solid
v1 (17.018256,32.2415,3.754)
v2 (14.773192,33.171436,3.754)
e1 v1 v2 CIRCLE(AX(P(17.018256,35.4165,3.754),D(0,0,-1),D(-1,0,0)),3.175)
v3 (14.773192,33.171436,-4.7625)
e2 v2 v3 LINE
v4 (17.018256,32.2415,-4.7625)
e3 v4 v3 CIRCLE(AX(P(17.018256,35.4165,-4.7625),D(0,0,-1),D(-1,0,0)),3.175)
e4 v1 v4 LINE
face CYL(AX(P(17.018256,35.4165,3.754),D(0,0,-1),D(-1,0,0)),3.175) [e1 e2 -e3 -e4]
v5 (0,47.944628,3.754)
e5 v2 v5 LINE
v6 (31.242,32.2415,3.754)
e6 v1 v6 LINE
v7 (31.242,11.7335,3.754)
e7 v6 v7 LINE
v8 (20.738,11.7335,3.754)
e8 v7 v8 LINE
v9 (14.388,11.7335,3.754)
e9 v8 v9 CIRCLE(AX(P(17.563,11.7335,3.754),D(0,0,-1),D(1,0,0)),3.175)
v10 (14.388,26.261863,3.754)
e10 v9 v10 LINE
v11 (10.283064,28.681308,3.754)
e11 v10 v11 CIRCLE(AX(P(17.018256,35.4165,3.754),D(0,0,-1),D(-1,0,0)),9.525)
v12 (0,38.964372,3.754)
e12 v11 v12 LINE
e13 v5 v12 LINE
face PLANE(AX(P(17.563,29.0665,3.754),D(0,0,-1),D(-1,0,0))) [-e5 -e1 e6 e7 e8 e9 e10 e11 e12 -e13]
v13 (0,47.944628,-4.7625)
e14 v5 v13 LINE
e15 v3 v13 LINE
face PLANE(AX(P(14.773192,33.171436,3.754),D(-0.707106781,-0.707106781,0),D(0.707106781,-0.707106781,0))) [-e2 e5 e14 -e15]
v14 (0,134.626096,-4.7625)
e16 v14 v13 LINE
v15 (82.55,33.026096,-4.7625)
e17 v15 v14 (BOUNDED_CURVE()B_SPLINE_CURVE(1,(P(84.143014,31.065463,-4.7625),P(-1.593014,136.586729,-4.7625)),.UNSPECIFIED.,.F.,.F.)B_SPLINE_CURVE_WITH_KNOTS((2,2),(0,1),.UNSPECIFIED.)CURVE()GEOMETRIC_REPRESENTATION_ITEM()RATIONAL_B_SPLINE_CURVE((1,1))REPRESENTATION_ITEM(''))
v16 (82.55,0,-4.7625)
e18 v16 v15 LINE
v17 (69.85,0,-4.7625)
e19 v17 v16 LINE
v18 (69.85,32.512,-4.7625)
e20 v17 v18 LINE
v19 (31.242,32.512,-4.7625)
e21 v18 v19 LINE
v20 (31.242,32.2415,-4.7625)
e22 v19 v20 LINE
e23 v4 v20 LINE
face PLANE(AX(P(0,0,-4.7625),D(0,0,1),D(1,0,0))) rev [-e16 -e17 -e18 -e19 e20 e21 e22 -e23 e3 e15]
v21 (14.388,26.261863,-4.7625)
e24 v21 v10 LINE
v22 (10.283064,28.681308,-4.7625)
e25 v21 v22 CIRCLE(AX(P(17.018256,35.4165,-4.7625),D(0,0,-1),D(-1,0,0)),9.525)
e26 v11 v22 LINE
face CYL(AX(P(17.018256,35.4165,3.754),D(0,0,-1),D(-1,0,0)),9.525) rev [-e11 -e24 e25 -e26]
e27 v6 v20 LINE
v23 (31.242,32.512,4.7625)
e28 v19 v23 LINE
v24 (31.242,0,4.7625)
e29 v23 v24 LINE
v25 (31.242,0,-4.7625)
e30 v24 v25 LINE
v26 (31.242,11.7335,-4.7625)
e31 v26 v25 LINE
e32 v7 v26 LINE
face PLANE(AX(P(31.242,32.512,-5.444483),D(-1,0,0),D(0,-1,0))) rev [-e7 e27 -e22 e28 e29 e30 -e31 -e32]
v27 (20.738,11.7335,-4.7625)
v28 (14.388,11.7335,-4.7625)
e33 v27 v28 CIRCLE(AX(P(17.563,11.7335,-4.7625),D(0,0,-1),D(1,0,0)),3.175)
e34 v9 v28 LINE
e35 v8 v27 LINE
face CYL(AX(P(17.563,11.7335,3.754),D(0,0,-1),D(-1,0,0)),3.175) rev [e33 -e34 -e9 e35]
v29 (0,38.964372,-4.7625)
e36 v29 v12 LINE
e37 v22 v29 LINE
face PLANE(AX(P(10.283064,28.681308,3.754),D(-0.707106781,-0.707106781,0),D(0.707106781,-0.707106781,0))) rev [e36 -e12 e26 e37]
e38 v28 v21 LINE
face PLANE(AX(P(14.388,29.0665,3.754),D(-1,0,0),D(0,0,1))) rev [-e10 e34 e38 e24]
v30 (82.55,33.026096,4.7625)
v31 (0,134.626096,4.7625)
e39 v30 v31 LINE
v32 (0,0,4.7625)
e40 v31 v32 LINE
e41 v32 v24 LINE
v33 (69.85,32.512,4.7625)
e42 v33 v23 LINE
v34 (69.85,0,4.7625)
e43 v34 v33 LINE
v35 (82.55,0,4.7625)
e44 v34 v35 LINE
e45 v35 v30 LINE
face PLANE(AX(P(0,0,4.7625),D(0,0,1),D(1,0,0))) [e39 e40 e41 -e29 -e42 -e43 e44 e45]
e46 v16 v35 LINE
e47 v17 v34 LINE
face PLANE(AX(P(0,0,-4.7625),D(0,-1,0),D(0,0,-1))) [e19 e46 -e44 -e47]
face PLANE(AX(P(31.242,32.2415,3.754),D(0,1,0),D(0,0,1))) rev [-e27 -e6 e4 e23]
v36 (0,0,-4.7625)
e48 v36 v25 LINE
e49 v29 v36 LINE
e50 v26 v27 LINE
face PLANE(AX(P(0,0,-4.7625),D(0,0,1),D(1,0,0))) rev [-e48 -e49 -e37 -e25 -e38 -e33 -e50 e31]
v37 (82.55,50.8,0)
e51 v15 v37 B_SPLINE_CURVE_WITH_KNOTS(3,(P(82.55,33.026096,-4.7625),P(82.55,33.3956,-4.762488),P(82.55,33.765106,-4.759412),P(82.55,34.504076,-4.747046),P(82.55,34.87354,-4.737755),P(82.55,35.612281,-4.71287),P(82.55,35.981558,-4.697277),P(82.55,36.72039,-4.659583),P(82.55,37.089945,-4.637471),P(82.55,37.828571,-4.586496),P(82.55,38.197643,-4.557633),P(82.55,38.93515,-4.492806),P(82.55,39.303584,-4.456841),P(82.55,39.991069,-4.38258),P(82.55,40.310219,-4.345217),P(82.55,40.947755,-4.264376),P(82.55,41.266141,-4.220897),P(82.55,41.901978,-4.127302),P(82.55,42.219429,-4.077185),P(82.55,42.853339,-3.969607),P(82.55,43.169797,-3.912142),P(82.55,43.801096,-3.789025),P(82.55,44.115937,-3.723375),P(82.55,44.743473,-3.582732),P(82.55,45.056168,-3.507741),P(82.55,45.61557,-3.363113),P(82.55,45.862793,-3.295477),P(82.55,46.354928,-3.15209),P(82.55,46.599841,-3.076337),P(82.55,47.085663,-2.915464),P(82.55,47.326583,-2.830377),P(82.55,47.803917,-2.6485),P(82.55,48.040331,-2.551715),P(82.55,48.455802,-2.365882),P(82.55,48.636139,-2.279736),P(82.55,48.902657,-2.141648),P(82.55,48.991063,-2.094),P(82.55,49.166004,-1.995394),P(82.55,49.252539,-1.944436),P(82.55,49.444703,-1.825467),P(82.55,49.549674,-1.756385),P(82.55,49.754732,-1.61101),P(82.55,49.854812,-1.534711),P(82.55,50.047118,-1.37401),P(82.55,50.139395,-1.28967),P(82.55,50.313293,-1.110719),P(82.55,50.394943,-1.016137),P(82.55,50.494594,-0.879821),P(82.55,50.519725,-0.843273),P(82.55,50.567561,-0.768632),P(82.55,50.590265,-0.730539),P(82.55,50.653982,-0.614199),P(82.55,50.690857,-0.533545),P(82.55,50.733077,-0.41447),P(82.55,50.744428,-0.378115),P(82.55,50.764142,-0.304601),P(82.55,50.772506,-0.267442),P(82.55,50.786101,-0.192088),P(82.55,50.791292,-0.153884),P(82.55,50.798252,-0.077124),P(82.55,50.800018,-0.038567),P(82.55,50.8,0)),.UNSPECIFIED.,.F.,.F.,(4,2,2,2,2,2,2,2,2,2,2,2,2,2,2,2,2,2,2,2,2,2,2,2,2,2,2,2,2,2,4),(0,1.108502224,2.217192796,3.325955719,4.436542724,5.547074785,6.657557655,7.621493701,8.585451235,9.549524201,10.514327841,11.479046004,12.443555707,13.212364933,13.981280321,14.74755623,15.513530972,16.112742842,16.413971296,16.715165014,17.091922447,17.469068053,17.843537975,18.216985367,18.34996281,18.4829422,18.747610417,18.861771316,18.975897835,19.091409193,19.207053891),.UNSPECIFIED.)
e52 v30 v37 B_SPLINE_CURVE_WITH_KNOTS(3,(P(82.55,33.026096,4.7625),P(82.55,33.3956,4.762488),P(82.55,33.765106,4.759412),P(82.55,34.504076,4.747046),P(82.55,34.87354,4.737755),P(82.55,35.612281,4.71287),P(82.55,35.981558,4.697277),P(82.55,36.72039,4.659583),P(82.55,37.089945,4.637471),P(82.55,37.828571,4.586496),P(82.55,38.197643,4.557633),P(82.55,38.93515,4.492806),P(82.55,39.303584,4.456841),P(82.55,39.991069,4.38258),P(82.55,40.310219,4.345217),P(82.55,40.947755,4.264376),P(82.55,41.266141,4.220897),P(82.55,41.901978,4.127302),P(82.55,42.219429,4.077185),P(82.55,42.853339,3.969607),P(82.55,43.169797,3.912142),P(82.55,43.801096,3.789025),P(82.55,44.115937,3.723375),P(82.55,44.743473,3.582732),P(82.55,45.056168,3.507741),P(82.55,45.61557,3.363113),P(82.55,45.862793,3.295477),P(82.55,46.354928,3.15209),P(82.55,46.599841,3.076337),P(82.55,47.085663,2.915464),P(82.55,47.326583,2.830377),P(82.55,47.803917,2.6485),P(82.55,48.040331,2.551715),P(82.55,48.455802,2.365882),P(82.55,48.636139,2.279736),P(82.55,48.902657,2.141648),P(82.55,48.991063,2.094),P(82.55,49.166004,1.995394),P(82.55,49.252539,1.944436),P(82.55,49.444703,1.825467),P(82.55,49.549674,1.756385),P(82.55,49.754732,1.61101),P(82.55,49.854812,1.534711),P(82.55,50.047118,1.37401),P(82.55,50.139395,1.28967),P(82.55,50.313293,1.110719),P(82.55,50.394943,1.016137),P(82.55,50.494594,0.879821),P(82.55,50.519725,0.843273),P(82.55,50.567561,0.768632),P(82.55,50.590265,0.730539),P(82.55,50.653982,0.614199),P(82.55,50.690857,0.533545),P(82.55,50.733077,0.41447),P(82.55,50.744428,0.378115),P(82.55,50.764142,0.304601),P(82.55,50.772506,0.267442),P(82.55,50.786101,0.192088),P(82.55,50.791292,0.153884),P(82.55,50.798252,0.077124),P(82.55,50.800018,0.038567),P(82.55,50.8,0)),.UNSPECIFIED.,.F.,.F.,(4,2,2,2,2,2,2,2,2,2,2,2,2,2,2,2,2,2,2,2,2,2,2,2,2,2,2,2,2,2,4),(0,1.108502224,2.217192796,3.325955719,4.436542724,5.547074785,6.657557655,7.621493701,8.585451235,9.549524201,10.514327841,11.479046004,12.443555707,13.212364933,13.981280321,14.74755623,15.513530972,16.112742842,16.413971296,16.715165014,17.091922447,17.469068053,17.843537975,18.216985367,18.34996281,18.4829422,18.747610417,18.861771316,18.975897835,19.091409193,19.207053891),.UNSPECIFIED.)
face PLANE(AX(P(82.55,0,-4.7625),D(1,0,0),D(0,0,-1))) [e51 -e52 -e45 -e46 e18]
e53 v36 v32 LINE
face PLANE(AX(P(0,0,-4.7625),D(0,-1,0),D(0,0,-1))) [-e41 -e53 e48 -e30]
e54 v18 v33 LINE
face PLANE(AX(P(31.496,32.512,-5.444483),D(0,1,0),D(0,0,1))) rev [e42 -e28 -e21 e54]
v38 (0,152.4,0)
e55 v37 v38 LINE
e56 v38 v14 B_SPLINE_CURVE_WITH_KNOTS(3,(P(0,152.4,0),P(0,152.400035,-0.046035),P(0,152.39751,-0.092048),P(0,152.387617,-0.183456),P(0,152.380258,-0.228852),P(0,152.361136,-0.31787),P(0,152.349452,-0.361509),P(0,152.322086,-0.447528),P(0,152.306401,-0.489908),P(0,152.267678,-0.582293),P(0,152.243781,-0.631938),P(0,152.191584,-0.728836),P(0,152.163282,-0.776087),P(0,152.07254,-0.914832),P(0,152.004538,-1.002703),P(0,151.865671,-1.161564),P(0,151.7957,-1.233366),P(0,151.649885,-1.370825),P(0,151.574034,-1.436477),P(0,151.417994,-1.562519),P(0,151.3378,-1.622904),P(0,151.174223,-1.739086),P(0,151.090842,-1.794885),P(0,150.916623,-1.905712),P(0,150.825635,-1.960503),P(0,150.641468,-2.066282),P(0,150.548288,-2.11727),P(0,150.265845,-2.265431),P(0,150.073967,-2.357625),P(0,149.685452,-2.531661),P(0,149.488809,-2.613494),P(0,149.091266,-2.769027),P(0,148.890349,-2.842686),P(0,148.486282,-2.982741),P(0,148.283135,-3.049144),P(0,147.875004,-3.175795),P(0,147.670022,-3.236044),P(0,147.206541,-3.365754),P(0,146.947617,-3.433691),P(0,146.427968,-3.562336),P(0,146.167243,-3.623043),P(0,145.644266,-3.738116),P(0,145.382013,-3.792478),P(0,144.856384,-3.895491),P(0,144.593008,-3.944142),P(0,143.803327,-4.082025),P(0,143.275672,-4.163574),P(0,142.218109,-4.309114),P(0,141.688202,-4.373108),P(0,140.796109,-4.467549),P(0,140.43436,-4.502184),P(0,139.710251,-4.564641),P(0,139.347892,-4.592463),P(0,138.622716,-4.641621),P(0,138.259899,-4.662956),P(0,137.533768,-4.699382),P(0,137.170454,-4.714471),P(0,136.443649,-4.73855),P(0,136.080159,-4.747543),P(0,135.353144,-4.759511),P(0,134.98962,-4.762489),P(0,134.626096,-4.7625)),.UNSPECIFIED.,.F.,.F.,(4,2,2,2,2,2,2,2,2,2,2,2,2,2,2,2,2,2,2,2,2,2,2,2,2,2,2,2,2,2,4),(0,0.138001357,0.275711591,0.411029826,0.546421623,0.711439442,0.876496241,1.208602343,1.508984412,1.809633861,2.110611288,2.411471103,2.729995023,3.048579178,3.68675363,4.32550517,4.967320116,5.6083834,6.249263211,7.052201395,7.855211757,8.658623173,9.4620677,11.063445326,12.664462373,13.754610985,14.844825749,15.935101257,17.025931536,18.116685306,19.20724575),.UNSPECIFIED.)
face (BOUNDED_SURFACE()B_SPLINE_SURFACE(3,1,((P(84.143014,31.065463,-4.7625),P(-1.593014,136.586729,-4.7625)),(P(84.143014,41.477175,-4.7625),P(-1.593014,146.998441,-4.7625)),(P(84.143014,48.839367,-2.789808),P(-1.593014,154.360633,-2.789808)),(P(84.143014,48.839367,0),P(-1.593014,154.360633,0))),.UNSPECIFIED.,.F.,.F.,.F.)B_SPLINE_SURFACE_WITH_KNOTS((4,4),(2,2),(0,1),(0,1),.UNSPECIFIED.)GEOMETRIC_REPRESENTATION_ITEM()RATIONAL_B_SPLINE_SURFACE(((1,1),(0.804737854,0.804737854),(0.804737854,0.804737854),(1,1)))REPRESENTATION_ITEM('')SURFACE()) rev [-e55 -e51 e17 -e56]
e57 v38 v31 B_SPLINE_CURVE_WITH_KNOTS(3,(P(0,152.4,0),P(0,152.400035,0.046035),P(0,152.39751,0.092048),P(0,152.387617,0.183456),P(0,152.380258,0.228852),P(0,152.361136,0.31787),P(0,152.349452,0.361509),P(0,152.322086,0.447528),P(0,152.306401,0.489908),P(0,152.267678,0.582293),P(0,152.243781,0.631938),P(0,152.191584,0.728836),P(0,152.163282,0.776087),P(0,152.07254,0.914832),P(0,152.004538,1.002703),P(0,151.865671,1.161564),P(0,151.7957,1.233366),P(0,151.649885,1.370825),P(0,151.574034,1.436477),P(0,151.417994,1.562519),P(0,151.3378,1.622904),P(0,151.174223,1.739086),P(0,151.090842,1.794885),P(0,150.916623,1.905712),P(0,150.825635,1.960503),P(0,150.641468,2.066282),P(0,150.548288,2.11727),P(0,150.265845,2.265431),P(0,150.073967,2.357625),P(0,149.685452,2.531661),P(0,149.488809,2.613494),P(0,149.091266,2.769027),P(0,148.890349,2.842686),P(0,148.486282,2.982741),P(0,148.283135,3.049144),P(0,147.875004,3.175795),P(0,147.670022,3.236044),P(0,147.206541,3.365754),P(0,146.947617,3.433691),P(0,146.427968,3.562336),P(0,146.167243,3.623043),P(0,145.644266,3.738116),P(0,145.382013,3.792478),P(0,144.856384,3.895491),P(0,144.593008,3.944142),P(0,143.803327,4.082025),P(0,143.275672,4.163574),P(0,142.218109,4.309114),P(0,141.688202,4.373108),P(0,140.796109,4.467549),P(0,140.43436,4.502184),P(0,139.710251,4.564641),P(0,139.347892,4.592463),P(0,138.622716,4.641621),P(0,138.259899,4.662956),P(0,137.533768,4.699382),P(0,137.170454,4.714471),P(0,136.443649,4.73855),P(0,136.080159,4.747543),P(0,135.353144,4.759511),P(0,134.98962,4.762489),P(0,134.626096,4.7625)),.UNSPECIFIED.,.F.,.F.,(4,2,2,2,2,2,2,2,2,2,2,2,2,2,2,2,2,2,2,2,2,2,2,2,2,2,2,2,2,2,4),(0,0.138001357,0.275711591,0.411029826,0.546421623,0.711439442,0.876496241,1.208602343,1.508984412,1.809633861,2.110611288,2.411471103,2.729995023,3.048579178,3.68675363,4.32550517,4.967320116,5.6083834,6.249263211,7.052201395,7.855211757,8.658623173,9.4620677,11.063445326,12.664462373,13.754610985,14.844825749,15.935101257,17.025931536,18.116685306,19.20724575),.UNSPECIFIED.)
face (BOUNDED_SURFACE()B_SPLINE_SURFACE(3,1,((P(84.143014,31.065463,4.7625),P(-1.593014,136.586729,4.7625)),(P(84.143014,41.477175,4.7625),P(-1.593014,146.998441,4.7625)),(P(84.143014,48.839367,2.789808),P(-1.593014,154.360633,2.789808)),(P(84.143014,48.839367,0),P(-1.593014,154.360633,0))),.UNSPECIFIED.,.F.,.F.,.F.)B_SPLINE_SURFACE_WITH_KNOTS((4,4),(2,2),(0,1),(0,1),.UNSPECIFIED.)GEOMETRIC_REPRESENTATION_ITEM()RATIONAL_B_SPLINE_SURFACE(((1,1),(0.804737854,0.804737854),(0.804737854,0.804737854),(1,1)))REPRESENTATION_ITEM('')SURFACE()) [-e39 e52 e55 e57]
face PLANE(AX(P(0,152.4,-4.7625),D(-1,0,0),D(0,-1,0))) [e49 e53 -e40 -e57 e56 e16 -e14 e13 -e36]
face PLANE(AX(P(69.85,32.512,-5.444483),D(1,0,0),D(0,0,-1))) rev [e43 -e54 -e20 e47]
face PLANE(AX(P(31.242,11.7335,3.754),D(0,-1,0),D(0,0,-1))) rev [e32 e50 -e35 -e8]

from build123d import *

# Parameters (mm, degrees)
CORE_DEPTH                = 4.7625
CORE_DEPTH_BACK           = 4.7625
LEADINGEDGE_START         = -118.279773997
LEADINGEDGE_DEPTH         = 144.703179824
CTRLSURFCUTOUT_DEPTH      = 174.386689122
CTRLSURFCUTOUT_DEPTH_BACK = 174.386689122
SERVOPKT_DEPTH            = 8.516499985
WIREPKT_START             = -8.516499985
WIREPKT_DEPTH             = 8.516499985


# Read off the part's stored shape, not the designer's step: LeadingEdge, WirePkt
with BuildPart() as part:
    # Sketch2 → Core (new, two sides: drawn at the far end of the back side and taken through both)
    with BuildSketch(Plane.XY.offset(-CORE_DEPTH_BACK)):
        Polygon((0, 0), (82.55, 0), (82.55, 50.8), (0, 152.4), align=None)
    extrude(amount=CORE_DEPTH + CORE_DEPTH_BACK)

    # LeadingEdge outline → LeadingEdge (cut)
    with BuildSketch(Plane(origin=(0, 0, 0), x_dir=(0.7761140001162661, 0.630592625094465, 0), z_dir=(0.6305926250944651, -0.776114000116266, 0)).offset(LEADINGEDGE_START)):
        with BuildLine():
            Line((96.102316064, 4.7625), (84.894223283, 4.7625))
            add(Edge.make_bspline(
                [(84.894223283, 4.7625), (91.459772026, 4.7625), (96.102316064, 2.789807909), (96.102316064, 0)],
                knots=[0, 0, 0, 0, 1, 1, 1, 1], degree=3, weights=[1, 0.804737854, 0.804737854, 1]))
            Line((96.102316064, 0), (96.102316064, 4.7625))
        make_face()
    leadingedge = extrude(amount=LEADINGEDGE_DEPTH, mode=Mode.SUBTRACT)

    # LeadingEdgeMirror: LeadingEdge across plane
    add(leadingedge.mirror(Plane.XY), mode=Mode.SUBTRACT)

    # Sketch4 → CtrlSurfCutout (cut, two sides: drawn at the far end of the back side and taken through both)
    with BuildSketch(Plane.XY.offset(-CTRLSURFCUTOUT_DEPTH_BACK)):
        Polygon((31.242, 0), (69.85, 0), (69.85, 31.75), (69.85, 32.512), (69.596, 32.512), (31.496, 32.512), (31.242, 32.512), align=None)
    extrude(amount=CTRLSURFCUTOUT_DEPTH + CTRLSURFCUTOUT_DEPTH_BACK, mode=Mode.SUBTRACT)

    # Sketch7 → ServoPkt (cut)
    with BuildSketch(Plane(origin=(0, 0, -4.7625), x_dir=(-1, 0, 0), z_dir=(0, 0, -1))):
        with BuildLine():
            Line((-31.242, 32.241499906), (-17.562999926, 32.241499906))
            ThreePointArc((-17.562999926, 32.241499906), (-15.317935896, 31.311563936), (-14.387999926, 29.066499906))
            Line((-14.387999926, 29.066499906), (-14.387999926, 11.733500028))
            ThreePointArc((-14.387999926, 11.733500028), (-17.562999926, 8.558500028), (-20.737999926, 11.733500028))
            Line((-20.737999926, 11.733500028), (-31.242, 11.733500028))
            Line((-31.242, 11.733500028), (-31.242, 32.241499906))
        make_face()
    extrude(amount=-SERVOPKT_DEPTH, mode=Mode.SUBTRACT)

    # WirePkt outline → WirePkt (cut)
    with BuildSketch(Plane(origin=(0, 0, -4.7625), x_dir=(-1, 0, 0), z_dir=(0, 0, -1)).offset(WIREPKT_START)):
        with BuildLine():
            Line((-14.387999926, 29.066499906), (-14.387999926, 26.261862953))
            ThreePointArc((-14.387999926, 26.261862953), (-12.181797279, 27.210752433), (-10.283063956, 28.681307815))
            Line((-10.283063956, 28.681307815), (0, 38.964371771))
            Line((0, 38.964371771), (0, 47.944627893))
            Line((0, 47.944627893), (-14.773192017, 33.171435876))
            ThreePointArc((-14.773192017, 33.171435876), (-15.803236149, 32.48318239), (-17.018256047, 32.241499906))
            Line((-17.018256047, 32.241499906), (-17.562999926, 32.241499906))
            ThreePointArc((-17.562999926, 32.241499906), (-15.317935896, 31.311563936), (-14.387999926, 29.066499906))
        make_face()
    extrude(amount=WIREPKT_DEPTH, mode=Mode.SUBTRACT)


solid = part.part
